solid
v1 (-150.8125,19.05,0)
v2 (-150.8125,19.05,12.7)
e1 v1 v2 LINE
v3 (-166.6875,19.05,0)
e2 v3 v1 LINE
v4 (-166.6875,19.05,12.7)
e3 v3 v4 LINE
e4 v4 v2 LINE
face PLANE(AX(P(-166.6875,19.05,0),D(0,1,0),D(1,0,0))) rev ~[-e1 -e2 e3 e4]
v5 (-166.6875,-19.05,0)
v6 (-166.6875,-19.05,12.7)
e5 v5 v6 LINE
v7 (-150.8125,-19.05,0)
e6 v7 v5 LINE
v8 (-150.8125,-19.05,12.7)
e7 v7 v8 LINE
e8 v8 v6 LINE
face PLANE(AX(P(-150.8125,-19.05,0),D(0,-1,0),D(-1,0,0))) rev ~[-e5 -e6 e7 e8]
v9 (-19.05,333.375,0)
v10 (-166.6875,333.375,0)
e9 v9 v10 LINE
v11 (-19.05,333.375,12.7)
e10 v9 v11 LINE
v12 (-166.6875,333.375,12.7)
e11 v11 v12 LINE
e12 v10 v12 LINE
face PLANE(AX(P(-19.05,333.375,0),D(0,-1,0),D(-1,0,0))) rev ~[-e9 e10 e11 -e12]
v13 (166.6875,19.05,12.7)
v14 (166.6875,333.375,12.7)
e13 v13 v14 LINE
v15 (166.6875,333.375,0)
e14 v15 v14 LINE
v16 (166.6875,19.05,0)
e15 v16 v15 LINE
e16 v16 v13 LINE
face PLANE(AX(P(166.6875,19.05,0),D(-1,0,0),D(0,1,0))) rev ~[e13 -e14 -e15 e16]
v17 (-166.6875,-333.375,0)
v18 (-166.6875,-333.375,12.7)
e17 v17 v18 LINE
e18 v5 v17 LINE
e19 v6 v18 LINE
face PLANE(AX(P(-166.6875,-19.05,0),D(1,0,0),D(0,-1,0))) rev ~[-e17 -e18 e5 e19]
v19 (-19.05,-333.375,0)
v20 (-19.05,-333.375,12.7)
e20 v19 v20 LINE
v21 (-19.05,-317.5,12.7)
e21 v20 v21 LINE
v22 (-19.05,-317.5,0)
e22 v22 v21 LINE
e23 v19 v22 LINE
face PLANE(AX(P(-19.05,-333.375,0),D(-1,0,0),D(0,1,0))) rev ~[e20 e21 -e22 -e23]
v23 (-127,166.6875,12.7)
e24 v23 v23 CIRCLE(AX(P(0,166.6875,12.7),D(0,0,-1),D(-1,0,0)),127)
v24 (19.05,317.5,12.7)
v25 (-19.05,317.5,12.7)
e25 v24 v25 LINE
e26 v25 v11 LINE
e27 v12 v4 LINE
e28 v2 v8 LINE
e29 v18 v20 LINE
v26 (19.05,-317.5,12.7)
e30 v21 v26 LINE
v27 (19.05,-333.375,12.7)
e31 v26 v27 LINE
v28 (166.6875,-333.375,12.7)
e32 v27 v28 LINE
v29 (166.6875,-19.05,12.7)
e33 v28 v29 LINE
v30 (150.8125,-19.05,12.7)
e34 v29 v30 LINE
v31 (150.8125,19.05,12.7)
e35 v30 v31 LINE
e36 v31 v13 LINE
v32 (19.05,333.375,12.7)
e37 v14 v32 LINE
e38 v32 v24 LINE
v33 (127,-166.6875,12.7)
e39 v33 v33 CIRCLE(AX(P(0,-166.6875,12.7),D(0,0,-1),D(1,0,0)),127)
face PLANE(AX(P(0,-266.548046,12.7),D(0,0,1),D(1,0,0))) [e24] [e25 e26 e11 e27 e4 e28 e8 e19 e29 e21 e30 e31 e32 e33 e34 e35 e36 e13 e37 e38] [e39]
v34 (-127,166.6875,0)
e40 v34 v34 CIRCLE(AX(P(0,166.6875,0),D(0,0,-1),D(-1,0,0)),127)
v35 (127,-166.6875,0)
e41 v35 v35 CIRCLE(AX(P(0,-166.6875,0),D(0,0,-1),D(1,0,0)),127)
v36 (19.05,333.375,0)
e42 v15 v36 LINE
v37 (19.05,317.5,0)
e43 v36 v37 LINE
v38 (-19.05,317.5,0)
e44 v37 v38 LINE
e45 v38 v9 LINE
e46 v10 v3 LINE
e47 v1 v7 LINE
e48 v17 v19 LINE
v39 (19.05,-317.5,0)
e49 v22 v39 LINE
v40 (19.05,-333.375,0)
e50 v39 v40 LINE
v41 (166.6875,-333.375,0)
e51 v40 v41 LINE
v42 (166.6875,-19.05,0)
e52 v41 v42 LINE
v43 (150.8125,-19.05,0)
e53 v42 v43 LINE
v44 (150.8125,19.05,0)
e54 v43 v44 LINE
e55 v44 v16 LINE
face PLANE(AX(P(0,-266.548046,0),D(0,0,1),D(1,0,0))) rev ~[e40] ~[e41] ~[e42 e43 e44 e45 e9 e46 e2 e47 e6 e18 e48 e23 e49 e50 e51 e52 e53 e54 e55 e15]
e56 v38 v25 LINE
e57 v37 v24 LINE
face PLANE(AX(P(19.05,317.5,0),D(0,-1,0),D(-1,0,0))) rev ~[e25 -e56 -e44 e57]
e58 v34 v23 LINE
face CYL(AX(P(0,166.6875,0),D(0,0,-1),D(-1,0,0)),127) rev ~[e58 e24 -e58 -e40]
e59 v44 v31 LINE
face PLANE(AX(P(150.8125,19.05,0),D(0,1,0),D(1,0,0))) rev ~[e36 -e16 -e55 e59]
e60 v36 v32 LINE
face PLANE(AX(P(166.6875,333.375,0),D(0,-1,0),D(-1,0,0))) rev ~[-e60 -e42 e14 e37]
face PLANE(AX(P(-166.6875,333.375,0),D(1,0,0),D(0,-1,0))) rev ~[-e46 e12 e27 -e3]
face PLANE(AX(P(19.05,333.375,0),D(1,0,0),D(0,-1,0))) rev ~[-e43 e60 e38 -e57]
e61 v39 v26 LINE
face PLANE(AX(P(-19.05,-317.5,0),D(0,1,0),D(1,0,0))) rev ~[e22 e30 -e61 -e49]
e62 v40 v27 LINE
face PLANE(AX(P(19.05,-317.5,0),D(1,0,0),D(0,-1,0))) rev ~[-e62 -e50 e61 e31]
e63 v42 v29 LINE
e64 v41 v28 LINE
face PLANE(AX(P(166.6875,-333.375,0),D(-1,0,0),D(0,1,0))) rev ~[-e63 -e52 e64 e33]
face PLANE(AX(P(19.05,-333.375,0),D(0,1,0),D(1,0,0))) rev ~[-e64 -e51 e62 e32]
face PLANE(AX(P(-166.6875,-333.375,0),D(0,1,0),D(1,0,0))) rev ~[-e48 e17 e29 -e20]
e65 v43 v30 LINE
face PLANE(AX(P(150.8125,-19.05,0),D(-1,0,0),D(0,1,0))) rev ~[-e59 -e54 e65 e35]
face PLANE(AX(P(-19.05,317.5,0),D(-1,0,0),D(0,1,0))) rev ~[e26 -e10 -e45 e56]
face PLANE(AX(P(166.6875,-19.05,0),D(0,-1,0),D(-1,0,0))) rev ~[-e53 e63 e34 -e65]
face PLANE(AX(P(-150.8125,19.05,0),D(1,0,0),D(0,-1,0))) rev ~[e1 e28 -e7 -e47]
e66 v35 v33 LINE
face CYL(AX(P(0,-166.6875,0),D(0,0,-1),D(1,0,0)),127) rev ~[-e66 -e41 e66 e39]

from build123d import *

# Parameters (mm, degrees)
F1_DEPTH = 12.7


with BuildPart() as f1:
    # F0 (on Top) → F1 (new body)
    with BuildSketch(Plane.XY):
        with BuildLine():
            Line((166.6875, -333.375), (166.6875, -166.6875))
            Line((166.6875, -166.6875), (127, -166.6875))
            ThreePointArc((127, -166.6875), (0, -293.6875), (-127, -166.6875))
            Line((-127, -166.6875), (-166.6875, -166.6875))
            Line((-166.6875, -166.6875), (-166.6875, -333.375))
            Line((-166.6875, -333.375), (-19.05, -333.375))
            Line((-19.05, -333.375), (-19.05, -317.5))
            Line((-19.05, -317.5), (19.05, -317.5))
            Line((19.05, -317.5), (19.05, -333.375))
            Line((19.05, -333.375), (166.6875, -333.375))
        make_face()
        with BuildLine():
            Line((127, 166.6875), (166.6875, 166.6875))
            Line((166.6875, 166.6875), (166.6875, 333.375))
            Line((166.6875, 333.375), (19.05, 333.375))
            Line((19.05, 333.375), (19.05, 317.5))
            Line((19.05, 317.5), (-19.05, 317.5))
            Line((-19.05, 317.5), (-19.05, 333.375))
            Line((-19.05, 333.375), (-166.6875, 333.375))
            Line((-166.6875, 333.375), (-166.6875, 166.6875))
            Line((-166.6875, 166.6875), (-127, 166.6875))
            ThreePointArc((-127, 166.6875), (0, 293.6875), (127, 166.6875))
        make_face()
        with BuildLine():
            Line((127, -166.6875), (166.6875, -166.6875))
            Line((166.6875, -166.6875), (166.6875, -19.05))
            Line((166.6875, -19.05), (150.8125, -19.05))
            Line((150.8125, -19.05), (150.8125, 19.05))
            Line((150.8125, 19.05), (166.6875, 19.05))
            Line((166.6875, 19.05), (166.6875, 166.6875))
            Line((166.6875, 166.6875), (127, 166.6875))
            ThreePointArc((127, 166.6875), (0, 39.6875), (-127, 166.6875))
            Line((-127, 166.6875), (-166.6875, 166.6875))
            Line((-166.6875, 166.6875), (-166.6875, 19.05))
            Line((-166.6875, 19.05), (-150.8125, 19.05))
            Line((-150.8125, 19.05), (-150.8125, -19.05))
            Line((-150.8125, -19.05), (-166.6875, -19.05))
            Line((-166.6875, -19.05), (-166.6875, -166.6875))
            Line((-166.6875, -166.6875), (-127, -166.6875))
            ThreePointArc((-127, -166.6875), (0, -39.6875), (127, -166.6875))
        make_face()
    extrude(amount=F1_DEPTH)


solid = f1.part
